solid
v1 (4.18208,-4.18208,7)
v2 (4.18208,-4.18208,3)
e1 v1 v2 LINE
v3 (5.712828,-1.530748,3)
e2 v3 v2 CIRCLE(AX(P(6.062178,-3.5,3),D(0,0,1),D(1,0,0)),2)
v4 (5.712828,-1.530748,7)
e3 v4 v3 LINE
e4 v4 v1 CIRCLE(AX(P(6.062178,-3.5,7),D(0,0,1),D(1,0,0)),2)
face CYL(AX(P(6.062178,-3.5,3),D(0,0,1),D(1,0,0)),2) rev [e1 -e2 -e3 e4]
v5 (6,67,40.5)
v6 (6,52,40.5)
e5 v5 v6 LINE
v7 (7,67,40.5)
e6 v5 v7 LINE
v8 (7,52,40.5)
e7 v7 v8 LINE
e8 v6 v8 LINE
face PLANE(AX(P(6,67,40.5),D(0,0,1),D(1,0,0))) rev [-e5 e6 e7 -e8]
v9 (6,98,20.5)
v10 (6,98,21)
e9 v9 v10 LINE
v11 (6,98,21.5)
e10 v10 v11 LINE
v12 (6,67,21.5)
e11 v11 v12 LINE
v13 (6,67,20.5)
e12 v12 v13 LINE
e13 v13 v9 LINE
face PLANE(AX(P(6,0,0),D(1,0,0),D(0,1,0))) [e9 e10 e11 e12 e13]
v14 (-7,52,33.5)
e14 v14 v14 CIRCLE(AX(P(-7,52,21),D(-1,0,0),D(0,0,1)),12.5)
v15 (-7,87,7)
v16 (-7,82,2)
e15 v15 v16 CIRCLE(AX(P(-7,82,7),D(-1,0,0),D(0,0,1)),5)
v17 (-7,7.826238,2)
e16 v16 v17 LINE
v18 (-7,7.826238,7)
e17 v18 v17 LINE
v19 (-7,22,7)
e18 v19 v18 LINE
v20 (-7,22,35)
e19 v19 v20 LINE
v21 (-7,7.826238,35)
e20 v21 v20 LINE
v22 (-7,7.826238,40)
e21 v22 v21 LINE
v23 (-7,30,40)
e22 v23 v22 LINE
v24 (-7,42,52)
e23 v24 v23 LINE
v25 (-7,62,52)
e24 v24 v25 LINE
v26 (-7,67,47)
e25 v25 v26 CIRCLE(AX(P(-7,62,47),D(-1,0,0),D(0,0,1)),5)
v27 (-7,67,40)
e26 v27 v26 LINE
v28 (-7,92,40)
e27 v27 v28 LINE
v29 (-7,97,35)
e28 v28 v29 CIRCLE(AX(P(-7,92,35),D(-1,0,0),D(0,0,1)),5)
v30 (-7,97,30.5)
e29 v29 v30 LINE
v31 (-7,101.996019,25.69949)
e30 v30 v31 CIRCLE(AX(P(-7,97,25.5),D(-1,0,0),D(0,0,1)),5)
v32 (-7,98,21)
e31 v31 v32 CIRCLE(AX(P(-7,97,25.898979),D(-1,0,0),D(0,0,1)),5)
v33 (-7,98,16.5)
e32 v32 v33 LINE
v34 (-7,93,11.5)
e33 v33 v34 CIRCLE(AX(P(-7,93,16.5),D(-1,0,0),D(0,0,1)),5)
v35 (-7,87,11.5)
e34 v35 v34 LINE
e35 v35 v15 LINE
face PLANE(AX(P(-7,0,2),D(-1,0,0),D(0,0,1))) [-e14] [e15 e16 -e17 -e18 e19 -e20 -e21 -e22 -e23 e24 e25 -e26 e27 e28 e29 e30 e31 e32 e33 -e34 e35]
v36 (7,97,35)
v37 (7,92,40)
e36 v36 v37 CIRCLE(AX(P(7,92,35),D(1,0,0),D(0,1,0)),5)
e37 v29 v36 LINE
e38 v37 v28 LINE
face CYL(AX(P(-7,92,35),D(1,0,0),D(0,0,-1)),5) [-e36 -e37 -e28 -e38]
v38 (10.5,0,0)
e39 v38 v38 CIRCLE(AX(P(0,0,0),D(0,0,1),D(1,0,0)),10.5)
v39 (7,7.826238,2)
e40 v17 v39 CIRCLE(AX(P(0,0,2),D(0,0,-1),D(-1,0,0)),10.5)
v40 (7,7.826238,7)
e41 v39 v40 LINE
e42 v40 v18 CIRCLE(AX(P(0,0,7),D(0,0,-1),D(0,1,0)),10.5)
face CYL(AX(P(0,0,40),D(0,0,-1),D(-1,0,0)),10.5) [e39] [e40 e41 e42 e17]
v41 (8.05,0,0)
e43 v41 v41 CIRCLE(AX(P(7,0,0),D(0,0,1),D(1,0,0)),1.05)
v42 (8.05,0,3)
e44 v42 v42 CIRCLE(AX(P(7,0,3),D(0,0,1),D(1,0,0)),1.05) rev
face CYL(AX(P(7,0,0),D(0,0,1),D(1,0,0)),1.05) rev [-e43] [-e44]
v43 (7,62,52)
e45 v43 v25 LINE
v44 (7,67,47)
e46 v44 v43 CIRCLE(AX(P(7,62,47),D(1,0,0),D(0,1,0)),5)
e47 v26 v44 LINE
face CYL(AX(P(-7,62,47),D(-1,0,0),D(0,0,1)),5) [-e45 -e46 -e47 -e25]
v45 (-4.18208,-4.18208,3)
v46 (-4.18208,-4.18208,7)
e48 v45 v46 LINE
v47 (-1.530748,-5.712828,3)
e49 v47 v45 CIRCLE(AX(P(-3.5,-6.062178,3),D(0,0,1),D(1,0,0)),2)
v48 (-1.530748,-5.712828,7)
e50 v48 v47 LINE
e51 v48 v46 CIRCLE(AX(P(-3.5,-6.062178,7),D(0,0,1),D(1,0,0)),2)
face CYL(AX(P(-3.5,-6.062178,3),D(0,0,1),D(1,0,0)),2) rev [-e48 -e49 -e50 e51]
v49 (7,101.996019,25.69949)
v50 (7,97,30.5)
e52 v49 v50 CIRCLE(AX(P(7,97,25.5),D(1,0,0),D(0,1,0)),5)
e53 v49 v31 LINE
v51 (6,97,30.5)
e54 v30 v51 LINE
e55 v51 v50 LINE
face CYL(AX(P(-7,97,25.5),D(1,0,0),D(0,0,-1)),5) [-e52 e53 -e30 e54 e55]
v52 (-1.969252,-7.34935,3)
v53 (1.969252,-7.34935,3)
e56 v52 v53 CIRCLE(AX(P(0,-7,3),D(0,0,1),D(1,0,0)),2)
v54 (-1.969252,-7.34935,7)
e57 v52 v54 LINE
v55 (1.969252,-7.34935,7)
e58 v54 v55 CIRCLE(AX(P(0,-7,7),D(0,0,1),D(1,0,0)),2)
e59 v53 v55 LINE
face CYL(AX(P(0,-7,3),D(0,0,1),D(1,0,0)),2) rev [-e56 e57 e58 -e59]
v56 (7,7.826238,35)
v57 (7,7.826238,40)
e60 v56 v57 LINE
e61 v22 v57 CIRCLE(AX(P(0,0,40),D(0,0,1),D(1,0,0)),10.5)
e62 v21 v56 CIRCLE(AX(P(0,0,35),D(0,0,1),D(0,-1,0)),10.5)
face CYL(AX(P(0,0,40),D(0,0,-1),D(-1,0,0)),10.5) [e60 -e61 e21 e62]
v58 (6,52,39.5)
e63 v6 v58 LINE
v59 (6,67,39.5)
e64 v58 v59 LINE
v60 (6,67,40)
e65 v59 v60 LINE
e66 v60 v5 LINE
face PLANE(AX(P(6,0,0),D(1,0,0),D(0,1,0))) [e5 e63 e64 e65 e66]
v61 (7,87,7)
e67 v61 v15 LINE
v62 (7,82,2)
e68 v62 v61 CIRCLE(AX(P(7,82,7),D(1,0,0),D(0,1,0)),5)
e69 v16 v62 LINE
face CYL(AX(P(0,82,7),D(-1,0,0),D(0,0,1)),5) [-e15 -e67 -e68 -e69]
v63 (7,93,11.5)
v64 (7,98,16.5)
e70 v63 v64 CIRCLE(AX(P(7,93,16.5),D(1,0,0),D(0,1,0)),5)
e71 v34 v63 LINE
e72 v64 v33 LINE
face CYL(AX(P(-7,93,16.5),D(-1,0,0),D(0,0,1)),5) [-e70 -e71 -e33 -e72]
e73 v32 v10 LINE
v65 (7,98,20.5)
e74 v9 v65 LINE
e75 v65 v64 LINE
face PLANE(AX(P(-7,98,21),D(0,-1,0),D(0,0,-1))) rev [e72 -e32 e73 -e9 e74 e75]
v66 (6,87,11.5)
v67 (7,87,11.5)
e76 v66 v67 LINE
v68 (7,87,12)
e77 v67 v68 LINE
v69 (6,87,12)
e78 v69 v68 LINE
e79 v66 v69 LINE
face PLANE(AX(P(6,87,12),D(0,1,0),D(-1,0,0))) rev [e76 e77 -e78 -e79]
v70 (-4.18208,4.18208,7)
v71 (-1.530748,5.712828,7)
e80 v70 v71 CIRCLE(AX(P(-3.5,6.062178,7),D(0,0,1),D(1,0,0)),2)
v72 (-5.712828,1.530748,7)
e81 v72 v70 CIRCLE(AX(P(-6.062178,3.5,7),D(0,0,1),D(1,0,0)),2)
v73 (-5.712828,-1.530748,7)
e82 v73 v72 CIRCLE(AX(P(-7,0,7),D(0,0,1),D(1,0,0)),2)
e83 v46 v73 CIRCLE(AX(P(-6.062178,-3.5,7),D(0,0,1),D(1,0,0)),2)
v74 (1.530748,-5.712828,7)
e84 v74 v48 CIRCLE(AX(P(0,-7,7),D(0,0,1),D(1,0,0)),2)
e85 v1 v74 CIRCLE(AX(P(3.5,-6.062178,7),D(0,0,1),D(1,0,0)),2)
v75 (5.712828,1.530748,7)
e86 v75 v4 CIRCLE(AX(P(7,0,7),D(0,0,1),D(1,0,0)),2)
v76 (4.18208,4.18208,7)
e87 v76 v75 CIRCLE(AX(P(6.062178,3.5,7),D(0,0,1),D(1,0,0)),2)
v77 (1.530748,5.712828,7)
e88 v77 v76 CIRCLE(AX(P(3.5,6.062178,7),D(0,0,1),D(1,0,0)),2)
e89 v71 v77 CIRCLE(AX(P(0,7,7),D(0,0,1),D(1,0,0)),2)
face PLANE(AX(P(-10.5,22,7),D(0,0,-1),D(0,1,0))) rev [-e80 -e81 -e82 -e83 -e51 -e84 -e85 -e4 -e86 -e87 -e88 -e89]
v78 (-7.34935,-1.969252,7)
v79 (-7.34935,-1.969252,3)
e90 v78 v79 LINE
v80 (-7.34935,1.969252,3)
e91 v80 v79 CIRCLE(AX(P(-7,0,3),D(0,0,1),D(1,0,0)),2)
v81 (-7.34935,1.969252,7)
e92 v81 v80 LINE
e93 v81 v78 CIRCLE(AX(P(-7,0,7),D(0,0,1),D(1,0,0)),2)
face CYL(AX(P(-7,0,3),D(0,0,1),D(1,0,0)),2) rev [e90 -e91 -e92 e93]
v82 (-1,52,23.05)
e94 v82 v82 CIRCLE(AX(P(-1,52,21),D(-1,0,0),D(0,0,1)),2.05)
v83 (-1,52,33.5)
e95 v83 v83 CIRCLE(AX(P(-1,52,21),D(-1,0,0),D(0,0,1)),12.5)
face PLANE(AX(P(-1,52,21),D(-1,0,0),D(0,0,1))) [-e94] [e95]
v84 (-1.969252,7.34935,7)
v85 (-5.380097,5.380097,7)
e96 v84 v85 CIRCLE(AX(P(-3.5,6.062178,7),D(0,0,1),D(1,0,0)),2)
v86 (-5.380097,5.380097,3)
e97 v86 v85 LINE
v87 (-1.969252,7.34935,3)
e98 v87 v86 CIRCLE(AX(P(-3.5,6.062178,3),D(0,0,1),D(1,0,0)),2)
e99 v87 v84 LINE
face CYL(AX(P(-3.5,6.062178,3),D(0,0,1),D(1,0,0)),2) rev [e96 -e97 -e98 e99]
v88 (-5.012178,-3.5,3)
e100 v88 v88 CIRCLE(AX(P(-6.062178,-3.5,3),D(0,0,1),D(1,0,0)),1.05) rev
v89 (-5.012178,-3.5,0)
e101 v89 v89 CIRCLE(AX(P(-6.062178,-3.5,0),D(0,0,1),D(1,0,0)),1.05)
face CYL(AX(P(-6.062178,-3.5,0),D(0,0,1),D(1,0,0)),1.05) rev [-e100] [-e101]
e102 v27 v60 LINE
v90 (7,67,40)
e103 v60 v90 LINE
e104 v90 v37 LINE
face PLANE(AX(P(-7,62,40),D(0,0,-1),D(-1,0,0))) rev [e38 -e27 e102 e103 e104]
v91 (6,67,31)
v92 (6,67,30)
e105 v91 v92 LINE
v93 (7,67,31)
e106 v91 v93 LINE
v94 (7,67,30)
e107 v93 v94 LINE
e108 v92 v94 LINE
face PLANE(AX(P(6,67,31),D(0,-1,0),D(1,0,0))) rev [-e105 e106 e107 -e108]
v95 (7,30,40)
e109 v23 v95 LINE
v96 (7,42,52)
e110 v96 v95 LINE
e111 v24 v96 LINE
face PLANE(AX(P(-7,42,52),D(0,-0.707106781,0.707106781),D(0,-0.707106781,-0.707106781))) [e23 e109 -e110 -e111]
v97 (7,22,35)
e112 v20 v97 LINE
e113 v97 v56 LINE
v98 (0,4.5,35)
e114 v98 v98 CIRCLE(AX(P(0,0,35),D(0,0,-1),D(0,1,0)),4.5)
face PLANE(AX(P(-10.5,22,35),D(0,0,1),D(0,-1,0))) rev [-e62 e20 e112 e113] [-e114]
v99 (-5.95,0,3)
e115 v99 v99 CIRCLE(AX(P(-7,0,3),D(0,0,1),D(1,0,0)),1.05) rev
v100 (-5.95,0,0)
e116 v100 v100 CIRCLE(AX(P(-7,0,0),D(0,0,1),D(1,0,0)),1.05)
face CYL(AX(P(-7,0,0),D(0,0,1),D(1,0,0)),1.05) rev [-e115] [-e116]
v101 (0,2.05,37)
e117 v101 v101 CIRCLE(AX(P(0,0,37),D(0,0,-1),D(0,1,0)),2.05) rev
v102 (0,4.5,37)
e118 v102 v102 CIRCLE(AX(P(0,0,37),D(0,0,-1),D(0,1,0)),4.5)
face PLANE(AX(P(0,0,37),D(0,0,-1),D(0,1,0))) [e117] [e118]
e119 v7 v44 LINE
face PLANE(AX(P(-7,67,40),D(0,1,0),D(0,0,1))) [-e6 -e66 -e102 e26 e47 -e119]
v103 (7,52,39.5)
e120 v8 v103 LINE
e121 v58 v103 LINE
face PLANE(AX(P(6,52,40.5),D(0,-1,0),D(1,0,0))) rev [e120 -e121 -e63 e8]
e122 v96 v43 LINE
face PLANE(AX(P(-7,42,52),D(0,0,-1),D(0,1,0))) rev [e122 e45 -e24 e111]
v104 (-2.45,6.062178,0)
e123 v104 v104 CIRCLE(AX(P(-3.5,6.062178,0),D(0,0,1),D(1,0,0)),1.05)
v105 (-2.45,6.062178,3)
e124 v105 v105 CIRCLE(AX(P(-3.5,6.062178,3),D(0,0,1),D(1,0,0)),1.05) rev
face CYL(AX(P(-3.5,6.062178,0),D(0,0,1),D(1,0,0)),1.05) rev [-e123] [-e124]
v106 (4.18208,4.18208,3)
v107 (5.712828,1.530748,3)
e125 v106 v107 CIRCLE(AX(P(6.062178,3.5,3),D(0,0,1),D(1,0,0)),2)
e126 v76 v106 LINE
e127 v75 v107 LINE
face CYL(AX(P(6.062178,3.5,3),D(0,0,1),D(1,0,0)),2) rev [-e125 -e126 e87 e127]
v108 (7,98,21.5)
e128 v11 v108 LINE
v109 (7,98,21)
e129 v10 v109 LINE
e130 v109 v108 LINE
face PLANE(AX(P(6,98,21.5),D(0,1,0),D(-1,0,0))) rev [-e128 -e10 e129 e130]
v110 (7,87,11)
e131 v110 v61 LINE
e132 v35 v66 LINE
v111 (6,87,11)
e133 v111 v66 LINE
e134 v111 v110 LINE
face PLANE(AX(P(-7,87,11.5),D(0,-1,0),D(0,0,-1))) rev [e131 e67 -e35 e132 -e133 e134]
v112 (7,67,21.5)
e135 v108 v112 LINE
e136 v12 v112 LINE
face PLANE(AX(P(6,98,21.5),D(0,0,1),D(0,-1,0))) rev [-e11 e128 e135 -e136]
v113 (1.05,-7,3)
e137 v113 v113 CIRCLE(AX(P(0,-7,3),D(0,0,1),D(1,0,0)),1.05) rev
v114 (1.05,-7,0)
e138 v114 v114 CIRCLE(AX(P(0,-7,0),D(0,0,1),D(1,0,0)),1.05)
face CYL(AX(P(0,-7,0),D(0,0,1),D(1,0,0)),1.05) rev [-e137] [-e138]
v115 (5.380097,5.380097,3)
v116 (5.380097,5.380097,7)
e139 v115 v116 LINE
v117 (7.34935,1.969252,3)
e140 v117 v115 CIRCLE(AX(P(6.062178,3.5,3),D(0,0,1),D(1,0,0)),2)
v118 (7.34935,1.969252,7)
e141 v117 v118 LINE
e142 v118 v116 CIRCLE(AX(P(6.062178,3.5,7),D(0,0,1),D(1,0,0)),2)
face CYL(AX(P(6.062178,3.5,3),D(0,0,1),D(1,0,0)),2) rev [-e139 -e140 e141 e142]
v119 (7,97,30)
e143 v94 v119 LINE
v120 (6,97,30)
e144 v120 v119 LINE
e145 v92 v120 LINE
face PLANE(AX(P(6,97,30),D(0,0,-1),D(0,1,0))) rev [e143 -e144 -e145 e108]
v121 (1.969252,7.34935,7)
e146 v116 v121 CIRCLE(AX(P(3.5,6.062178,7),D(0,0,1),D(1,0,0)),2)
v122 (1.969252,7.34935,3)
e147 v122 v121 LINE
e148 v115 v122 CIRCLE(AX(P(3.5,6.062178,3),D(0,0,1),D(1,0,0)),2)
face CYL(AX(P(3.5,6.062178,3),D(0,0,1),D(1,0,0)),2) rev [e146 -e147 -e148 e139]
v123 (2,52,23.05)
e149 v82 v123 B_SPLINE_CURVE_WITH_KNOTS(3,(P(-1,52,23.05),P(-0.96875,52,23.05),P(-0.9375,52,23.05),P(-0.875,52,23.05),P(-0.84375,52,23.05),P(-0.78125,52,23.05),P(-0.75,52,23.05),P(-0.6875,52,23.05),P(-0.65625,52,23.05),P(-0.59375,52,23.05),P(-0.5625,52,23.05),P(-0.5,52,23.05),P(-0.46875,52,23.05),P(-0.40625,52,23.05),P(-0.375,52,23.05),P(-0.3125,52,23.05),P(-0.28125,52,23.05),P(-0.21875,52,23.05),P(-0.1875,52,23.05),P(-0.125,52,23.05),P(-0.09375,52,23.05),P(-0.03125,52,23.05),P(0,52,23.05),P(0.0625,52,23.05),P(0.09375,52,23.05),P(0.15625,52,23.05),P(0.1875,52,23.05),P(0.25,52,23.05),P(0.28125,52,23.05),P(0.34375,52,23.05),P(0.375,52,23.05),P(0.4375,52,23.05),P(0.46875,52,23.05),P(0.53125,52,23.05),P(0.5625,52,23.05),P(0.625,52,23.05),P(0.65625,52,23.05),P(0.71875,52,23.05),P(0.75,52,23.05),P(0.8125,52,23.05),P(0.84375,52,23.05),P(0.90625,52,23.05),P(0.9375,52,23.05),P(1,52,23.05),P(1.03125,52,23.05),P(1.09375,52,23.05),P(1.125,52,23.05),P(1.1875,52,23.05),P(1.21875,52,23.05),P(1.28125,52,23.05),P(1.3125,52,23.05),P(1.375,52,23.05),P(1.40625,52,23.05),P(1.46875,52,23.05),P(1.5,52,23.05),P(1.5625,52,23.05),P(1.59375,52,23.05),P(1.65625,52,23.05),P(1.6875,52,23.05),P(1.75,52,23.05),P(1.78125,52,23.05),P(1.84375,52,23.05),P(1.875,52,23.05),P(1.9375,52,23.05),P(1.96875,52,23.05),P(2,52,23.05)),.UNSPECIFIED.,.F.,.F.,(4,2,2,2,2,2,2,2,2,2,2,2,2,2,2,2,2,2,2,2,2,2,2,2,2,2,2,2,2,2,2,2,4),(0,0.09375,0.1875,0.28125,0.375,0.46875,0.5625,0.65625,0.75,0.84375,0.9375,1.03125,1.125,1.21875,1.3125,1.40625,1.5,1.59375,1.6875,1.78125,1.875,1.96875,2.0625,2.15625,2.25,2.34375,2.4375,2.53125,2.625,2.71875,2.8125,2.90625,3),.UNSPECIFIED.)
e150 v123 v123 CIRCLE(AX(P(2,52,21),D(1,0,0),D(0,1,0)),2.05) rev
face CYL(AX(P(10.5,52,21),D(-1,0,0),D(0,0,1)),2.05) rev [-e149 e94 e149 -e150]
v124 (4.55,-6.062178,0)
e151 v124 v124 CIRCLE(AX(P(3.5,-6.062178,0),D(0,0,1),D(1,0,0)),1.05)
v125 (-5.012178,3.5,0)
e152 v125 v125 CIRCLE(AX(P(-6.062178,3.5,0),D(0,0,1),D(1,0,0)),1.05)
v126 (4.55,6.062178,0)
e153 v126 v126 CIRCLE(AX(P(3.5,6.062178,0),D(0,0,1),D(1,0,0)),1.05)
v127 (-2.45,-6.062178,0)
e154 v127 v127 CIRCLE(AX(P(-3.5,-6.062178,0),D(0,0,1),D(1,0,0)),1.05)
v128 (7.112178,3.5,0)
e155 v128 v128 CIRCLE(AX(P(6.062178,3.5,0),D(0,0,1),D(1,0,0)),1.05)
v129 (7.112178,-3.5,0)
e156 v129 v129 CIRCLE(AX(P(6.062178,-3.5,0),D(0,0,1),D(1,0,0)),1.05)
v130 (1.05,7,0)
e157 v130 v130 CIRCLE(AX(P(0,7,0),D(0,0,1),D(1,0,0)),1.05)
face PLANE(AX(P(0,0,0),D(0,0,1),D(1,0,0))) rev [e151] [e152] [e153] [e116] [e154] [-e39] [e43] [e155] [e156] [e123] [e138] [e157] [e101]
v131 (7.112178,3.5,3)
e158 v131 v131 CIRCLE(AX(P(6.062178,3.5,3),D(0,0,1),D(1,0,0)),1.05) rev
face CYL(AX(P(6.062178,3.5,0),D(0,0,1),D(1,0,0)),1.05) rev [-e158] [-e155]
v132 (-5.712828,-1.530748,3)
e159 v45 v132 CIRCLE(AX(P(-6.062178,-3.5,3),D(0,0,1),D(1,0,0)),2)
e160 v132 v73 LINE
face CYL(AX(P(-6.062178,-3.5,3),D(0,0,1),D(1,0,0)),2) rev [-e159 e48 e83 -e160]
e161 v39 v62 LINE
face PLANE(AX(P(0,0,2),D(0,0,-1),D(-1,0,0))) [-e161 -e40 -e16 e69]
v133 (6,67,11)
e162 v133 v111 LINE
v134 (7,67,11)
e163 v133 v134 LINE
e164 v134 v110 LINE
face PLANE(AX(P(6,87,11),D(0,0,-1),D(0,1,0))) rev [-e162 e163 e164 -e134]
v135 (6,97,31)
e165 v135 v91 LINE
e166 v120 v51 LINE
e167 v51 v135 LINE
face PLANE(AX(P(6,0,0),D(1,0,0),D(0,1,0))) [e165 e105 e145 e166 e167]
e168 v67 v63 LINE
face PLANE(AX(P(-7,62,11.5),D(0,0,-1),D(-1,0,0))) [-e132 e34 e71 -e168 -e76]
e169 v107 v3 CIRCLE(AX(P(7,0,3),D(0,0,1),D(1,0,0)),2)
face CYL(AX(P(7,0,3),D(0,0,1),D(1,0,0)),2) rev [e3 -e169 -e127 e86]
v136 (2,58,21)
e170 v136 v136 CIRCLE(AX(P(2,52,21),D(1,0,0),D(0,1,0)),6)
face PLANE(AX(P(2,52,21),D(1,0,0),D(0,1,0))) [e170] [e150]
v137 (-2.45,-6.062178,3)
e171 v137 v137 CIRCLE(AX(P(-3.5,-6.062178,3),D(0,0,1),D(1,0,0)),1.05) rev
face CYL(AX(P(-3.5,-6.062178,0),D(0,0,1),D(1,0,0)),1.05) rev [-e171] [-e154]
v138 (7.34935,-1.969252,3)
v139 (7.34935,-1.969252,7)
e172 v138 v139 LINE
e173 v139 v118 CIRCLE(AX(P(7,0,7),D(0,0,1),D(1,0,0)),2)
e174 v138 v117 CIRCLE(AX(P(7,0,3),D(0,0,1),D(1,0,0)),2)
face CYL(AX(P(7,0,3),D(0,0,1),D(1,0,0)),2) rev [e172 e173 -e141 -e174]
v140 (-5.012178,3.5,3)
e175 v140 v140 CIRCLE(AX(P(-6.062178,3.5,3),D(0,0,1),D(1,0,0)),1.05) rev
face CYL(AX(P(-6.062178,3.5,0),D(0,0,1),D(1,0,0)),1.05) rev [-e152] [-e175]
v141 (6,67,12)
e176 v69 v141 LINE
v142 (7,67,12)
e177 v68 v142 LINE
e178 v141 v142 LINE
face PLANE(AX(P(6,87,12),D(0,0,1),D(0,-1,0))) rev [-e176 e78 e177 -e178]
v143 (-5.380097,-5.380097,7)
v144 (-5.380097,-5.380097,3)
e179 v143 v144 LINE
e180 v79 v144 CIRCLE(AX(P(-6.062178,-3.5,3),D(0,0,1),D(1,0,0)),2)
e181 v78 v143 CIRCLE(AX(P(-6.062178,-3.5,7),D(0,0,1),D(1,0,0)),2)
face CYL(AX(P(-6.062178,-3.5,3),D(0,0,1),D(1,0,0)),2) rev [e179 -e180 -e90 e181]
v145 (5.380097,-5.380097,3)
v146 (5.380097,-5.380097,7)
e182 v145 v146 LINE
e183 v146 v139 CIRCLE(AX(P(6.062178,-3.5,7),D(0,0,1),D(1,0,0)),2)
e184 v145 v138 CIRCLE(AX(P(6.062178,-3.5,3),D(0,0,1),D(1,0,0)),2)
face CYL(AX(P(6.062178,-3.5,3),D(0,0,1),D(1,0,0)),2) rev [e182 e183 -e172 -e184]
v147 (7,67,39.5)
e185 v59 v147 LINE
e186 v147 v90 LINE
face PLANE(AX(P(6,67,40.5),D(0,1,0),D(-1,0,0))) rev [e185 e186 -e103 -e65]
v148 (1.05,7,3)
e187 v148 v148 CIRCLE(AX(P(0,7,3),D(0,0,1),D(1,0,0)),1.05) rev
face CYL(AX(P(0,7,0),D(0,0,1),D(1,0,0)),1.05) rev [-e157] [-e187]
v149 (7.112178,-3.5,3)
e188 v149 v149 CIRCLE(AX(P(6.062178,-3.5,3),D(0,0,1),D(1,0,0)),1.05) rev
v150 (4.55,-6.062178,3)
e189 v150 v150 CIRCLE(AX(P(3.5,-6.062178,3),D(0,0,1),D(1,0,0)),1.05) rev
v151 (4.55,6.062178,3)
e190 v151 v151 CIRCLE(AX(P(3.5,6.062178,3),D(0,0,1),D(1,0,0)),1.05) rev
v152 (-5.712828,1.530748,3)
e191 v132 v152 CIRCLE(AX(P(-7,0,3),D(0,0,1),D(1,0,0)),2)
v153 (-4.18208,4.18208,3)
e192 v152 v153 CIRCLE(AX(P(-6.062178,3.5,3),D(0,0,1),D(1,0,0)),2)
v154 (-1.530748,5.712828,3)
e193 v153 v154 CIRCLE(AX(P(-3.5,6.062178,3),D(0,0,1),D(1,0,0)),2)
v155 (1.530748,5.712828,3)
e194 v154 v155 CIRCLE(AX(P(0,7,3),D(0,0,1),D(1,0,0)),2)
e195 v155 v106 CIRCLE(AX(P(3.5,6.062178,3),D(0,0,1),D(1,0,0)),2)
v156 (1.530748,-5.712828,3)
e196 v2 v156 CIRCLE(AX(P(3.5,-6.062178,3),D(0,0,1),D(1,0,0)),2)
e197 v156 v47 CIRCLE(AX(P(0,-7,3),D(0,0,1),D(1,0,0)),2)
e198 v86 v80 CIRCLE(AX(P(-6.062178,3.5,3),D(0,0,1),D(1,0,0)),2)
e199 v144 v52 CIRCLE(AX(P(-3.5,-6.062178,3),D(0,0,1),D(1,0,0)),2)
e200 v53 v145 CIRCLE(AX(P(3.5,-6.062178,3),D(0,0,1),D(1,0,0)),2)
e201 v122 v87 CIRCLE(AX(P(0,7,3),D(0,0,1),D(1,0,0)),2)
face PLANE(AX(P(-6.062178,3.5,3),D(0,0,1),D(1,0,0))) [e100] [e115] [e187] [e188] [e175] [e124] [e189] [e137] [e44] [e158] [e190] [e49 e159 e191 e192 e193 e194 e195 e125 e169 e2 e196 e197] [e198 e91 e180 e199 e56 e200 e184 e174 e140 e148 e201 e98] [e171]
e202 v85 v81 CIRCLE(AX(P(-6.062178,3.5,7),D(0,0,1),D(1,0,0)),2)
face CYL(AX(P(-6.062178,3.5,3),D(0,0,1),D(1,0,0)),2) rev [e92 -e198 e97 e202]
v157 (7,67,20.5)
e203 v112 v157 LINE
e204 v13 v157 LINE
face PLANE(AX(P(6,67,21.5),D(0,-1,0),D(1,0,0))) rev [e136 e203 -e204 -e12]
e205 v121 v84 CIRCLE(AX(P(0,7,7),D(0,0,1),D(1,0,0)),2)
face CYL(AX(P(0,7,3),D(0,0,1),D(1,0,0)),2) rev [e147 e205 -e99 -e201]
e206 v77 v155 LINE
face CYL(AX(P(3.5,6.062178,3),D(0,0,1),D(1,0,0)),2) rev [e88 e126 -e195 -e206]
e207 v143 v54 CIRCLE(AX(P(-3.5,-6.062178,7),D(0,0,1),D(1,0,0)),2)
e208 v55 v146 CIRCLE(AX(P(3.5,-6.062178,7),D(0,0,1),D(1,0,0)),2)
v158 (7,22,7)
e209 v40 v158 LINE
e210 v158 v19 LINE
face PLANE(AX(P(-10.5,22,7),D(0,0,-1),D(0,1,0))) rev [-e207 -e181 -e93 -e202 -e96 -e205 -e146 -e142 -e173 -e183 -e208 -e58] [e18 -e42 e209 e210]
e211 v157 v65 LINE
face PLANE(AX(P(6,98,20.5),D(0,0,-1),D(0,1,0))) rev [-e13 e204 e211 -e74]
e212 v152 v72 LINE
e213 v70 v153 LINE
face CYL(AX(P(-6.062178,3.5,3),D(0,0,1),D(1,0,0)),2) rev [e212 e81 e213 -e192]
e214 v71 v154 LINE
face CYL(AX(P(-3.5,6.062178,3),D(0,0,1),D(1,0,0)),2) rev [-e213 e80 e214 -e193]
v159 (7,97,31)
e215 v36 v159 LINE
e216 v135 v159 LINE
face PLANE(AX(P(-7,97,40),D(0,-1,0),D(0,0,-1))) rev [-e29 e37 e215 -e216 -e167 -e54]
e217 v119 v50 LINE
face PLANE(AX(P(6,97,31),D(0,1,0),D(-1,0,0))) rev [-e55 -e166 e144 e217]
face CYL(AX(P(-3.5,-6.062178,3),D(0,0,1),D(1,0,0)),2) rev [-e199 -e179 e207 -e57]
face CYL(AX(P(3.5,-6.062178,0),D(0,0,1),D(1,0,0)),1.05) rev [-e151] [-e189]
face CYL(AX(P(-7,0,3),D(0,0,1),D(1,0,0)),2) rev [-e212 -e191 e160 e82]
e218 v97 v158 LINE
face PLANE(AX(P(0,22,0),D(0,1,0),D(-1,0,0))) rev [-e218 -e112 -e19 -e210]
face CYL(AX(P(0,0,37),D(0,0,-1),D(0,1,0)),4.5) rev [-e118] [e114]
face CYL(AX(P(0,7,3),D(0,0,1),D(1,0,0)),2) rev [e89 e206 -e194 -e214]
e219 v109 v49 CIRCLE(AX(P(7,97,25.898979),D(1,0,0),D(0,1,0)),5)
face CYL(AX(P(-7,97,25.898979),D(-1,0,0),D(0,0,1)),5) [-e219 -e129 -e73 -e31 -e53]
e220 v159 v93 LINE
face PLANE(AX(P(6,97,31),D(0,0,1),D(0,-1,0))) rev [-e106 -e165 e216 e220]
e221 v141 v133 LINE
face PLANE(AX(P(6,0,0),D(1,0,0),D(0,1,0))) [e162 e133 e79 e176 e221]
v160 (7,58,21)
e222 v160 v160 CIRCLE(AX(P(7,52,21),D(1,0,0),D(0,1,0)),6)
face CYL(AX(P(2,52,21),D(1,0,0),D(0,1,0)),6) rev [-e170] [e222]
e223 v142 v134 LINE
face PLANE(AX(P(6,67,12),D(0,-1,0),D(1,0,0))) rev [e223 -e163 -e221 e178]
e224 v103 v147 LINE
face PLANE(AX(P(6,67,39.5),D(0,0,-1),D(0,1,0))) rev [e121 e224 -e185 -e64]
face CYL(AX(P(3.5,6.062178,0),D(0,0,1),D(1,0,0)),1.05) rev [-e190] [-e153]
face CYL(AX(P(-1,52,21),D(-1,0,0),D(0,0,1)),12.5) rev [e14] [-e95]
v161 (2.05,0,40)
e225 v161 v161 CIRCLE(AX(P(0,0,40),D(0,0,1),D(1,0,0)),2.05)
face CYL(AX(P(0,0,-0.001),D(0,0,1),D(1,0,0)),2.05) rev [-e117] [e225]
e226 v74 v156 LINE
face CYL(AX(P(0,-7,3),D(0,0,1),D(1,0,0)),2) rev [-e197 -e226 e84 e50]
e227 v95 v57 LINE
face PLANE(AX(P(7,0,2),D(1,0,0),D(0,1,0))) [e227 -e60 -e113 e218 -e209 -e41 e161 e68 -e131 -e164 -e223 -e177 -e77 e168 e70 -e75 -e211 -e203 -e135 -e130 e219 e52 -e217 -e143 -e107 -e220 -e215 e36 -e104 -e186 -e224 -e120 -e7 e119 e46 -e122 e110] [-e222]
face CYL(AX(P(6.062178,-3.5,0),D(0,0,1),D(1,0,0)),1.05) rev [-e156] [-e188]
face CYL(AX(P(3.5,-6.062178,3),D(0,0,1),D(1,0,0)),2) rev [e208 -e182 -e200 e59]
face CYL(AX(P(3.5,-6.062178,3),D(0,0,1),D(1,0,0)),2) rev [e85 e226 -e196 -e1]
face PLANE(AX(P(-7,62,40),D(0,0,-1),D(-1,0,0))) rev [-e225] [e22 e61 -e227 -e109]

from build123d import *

# Parameters (mm, degrees)
SKETCH2_R               = 10.5
BOSS_EXTRUDE1_DEPTH     = 40
SKETCH4_W               = 14
SKETCH4_H               = 22
BOSS_EXTRUDE2_DEPTH     = 38
CUT_EXTRUDE1_DEPTH      = 49.890183064
CUT_EXTRUDE1_DEPTH_BACK = 49.890183064
SKETCH5_W               = 28
SKETCH5_H               = 32.5
SKETCH6_W               = 14
SKETCH6_H               = 38
BOSS_EXTRUDE3_DEPTH     = 40
SKETCH7_W               = 9.5
SKETCH7_H               = 25
BOSS_EXTRUDE4_DEPTH     = 14
BOSS_EXTRUDE5_DEPTH     = 14
SKETCH9_W               = 1
SKETCH9_H               = 30
SKETCH9_H_2             = 31
SKETCH9_H_3             = 20
SKETCH9_H_4             = 15
CUT_EXTRUDE2_DEPTH      = 1
FILLET1_R               = 5
SKETCH10_R              = 12.5
CUT_EXTRUDE3_DEPTH      = 6
SKETCH11_R              = 2.05
CUT_EXTRUDE4_DEPTH      = 116.062756142
SKETCH12_R              = 6
CUT_EXTRUDE5_DEPTH      = 5
CUT_EXTRUDE6_REACH      = 112.061
SKETCH13_R              = 2.05
SKETCH14_R              = 4.5
CUT_EXTRUDE7_DEPTH      = 2
SKETCH15_R              = 1.05
CUT_EXTRUDE8_DEPTH      = 112.975166224
SKETCH17_R              = 2
CUT_EXTRUDE9_DEPTH      = 4


with BuildPart() as part:
    # Sketch2 → Boss-Extrude1 (new body)
    with BuildSketch(Plane.XY):
        Circle(SKETCH2_R)
    extrude(amount=BOSS_EXTRUDE1_DEPTH)

    # Sketch4 → Boss-Extrude2 (add)
    with BuildSketch(Plane.XY.offset(40)):
        with Locations((0, 11)):
            Rectangle(SKETCH4_W, SKETCH4_H)
    extrude(amount=-BOSS_EXTRUDE2_DEPTH)

    # Sketch5 → Cut-Extrude1 (cut, two sides: drawn at the far end of the back side and taken through both)
    with BuildSketch(Plane(origin=(7, 0, 0), x_dir=(0, 0, -1), z_dir=(1, 0, 0)).offset(-CUT_EXTRUDE1_DEPTH_BACK)):
        with Locations((-21, 5.75)):
            Rectangle(SKETCH5_W, SKETCH5_H)
    extrude(amount=CUT_EXTRUDE1_DEPTH + CUT_EXTRUDE1_DEPTH_BACK, mode=Mode.SUBTRACT)


with BuildPart() as cut_extrude1_piece_1:
    # of the separate pieces the step leaves, piece 1, a body of its own (cut_extrude1_pieces)
    add(part.part.solids().sort_by_distance((10.5, 0, 0))[0])



with BuildPart() as cut_extrude1_piece_2:
    # of the separate pieces the step leaves, piece 2, a body of its own (cut_extrude1_pieces)
    add(part.part.solids().sort_by_distance((7, 7.826237921, 40))[0])


with BuildPart() as cut_extrude1_piece_1_1:
    add(cut_extrude1_piece_1.part)

    add(cut_extrude1_piece_2.part)  # Boss-Extrude3 merges Cut-Extrude1 piece 2
    # Sketch6 → Boss-Extrude3 (add)
    with BuildSketch(Plane(origin=(0, 22, 0), x_dir=(1, 0, 0), z_dir=(0, 1, 0))):
        with Locations((0, -21)):
            Rectangle(SKETCH6_W, SKETCH6_H)
    extrude(amount=BOSS_EXTRUDE3_DEPTH)

    # Sketch7 → Boss-Extrude4 (add)
    with BuildSketch(Plane(origin=(7, 0, 0), x_dir=(0, 0, -1), z_dir=(1, 0, 0))):
        Polygon((-52, 42), (-40, 42), (-40, 62), (-40, 67), (-52, 67), align=None)
        Polygon((-40, 67), (-40, 62), (-30.5, 62), (-30.5, 97), (-40, 97), align=None)
        Polygon((-30.5, 97), (-30.5, 62), (-21, 62), (-21, 98), (-21, 102), (-30.5, 102), align=None)
        Polygon((-21, 98), (-21, 62), (-11.5, 62), (-11.5, 87), (-11.5, 98), align=None)
        with Locations((-6.75, 74.5)):
            Rectangle(SKETCH7_W, SKETCH7_H)
    extrude(amount=-BOSS_EXTRUDE4_DEPTH)

    # Sketch8 → Boss-Extrude5 (add)
    with BuildSketch(Plane(origin=(7, 0, 0), x_dir=(0, 0, -1), z_dir=(1, 0, 0))):
        Polygon((-52, 42), (-40, 30), (-40, 42), align=None)
    extrude(amount=-BOSS_EXTRUDE5_DEPTH)

    # Sketch9 → Cut-Extrude2 (cut)
    with BuildSketch(Plane(origin=(7, 0, 0), x_dir=(0, 0, -1), z_dir=(1, 0, 0))):
        with Locations((-30.5, 82)):
            Rectangle(SKETCH9_W, SKETCH9_H)
        with Locations((-21, 82.5)):
            Rectangle(SKETCH9_W, SKETCH9_H_2)
        with Locations((-11.5, 77)):
            Rectangle(SKETCH9_W, SKETCH9_H_3)
        with Locations((-40, 59.5)):
            Rectangle(SKETCH9_W, SKETCH9_H_4)
    extrude(amount=-CUT_EXTRUDE2_DEPTH, mode=Mode.SUBTRACT)

    # Fillet1
    # the kernel refuses this fillet: 5 mm, written as the material it takes off along each edge
    with BuildSketch(Plane(origin=(19.5, 67, 52), x_dir=(0, -1, 0), z_dir=(-1, 0, 0)), Plane(origin=(19.5, 97, 40), x_dir=(0, -1, 0), z_dir=(-1, 0, 0)), Plane(origin=(19.5, 102, 30.5), x_dir=(0, -1, 0), z_dir=(-1, 0, 0)), Plane(origin=(19.5, 98, 11.5), x_dir=(0, 0, 1), z_dir=(-1, 0, 0)), Plane(origin=(19.5, 87, 2), x_dir=(0, 0, 1), z_dir=(-1, 0, 0))) as fillet1_piece_1:
        with BuildLine():
            CenterArc((FILLET1_R, -FILLET1_R), FILLET1_R, 90, 90)
            Line((0, -FILLET1_R), (-FILLET1_R * 0.02, -FILLET1_R))
            Line((-FILLET1_R * 0.02, -FILLET1_R), (-FILLET1_R * 0.02, FILLET1_R * 0.02))
            Line((-FILLET1_R * 0.02, FILLET1_R * 0.02), (FILLET1_R, FILLET1_R * 0.02))
            Line((FILLET1_R, FILLET1_R * 0.02), (FILLET1_R, 0))
        make_face()
    extrude(amount=39, mode=Mode.SUBTRACT)
    with BuildSketch(Plane(origin=(19.247448714, 102, 21), x_dir=(0, 0, 1), z_dir=(-1, 0, 0))) as fillet1_piece_2:
        with BuildLine():
            CenterArc((4.898979486, -5), FILLET1_R, 90, 78.463040967)
            Line((0, -4), (-0.09797959, -3.98))
            ThreePointArc((-0.09797959, -3.98), (-0.1, -2), (-0.1, 0))
            Line((-0.1, 0), (0, 0.1))
            Line((0, 0.1), (4.898979486, 0.1))
            Line((4.898979486, 0.1), (4.898979486, 0))
        make_face()
    extrude(amount=38.494897428, mode=Mode.SUBTRACT)

    # Sketch10 → Cut-Extrude3 (cut)
    with BuildSketch(Plane.ZY.offset(7)):
        with Locations((21, 52)):
            Circle(SKETCH10_R)
    extrude(amount=-CUT_EXTRUDE3_DEPTH, mode=Mode.SUBTRACT)

    # Sketch11 → Cut-Extrude4 (cut, through all)
    with BuildSketch(Plane.ZY.offset(1)):
        with Locations((21, 52)):
            Circle(SKETCH11_R)
    extrude(amount=-CUT_EXTRUDE4_DEPTH, mode=Mode.SUBTRACT)

    # Sketch12 → Cut-Extrude5 (cut)
    with BuildSketch(Plane(origin=(7, 0, 0), x_dir=(0, 0, -1), z_dir=(1, 0, 0))):
        with Locations(Location((-21, 52, 0), (0, 0, 90))):
            Circle(SKETCH12_R)
    extrude(amount=-CUT_EXTRUDE5_DEPTH, mode=Mode.SUBTRACT)

    # Sketch13 → Cut-Extrude6 (cut, up to next)
    with BuildSketch(Plane.XY.offset(40), mode=Mode.PRIVATE) as cut_extrude6_sk1:
        Circle(SKETCH13_R)
    cut_extrude6_tool1 = extrude(cut_extrude6_sk1.sketch, amount=-CUT_EXTRUDE6_REACH, mode=Mode.PRIVATE) & cut_extrude1_piece_1_1.part
    add(cut_extrude6_tool1.solids().sort_by_distance((0, 0, 40))[0], mode=Mode.SUBTRACT)

    # Sketch14 → Cut-Extrude7 (cut)
    with BuildSketch(Plane(origin=(0, 0, 35), x_dir=(-1, 0, 0), z_dir=(0, 0, -1))):
        with Locations(Location((0, 0, 0), (0, 0, 90))):
            Circle(SKETCH14_R)
    extrude(amount=-CUT_EXTRUDE7_DEPTH, mode=Mode.SUBTRACT)

    # Sketch15 → Cut-Extrude8 (cut, through all)
    with BuildSketch(Plane.XY.offset(7)):
        with Locations((-6.062177826, 3.5)):
            Circle(SKETCH15_R)
        with Locations((-6.062177826, -3.5)):
            Circle(SKETCH15_R)
        with Locations((-3.5, -6.062177826)):
            Circle(SKETCH15_R)
        with Locations((0, -7)):
            Circle(SKETCH15_R)
        with Locations((3.5, -6.062177826)):
            Circle(SKETCH15_R)
        with Locations((6.062177826, -3.5)):
            Circle(SKETCH15_R)
        with Locations((7, 0)):
            Circle(SKETCH15_R)
        with Locations((6.062177826, 3.5)):
            Circle(SKETCH15_R)
        with Locations((3.5, 6.062177826)):
            Circle(SKETCH15_R)
        with Locations((0, 7)):
            Circle(SKETCH15_R)
        with Locations((-3.5, 6.062177826)):
            Circle(SKETCH15_R)
        with Locations((-7, 0)):
            Circle(SKETCH15_R)
    extrude(amount=-CUT_EXTRUDE8_DEPTH, mode=Mode.SUBTRACT)

    # Sketch17 → Cut-Extrude9 (cut)
    with BuildSketch(Plane.XY.offset(7)):
        with Locations((0, 7)):
            Circle(SKETCH17_R)
        with Locations((3.5, 6.062177826)):
            Circle(SKETCH17_R)
        with Locations((-3.5, 6.062177826)):
            Circle(SKETCH17_R)
        with Locations((-6.062177826, 3.5)):
            Circle(SKETCH17_R)
        with Locations((-7, 0)):
            Circle(SKETCH17_R)
        with Locations((-6.062177826, -3.5)):
            Circle(SKETCH17_R)
        with Locations((-3.5, -6.062177826)):
            Circle(SKETCH17_R)
        with Locations((0, -7)):
            Circle(SKETCH17_R)
        with Locations((3.5, -6.062177826)):
            Circle(SKETCH17_R)
        with Locations((6.062177826, -3.5)):
            Circle(SKETCH17_R)
        with Locations((7, 0)):
            Circle(SKETCH17_R)
        with Locations((6.062177826, 3.5)):
            Circle(SKETCH17_R)
    extrude(amount=-CUT_EXTRUDE9_DEPTH, mode=Mode.SUBTRACT)


solid = cut_extrude1_piece_1_1.part
